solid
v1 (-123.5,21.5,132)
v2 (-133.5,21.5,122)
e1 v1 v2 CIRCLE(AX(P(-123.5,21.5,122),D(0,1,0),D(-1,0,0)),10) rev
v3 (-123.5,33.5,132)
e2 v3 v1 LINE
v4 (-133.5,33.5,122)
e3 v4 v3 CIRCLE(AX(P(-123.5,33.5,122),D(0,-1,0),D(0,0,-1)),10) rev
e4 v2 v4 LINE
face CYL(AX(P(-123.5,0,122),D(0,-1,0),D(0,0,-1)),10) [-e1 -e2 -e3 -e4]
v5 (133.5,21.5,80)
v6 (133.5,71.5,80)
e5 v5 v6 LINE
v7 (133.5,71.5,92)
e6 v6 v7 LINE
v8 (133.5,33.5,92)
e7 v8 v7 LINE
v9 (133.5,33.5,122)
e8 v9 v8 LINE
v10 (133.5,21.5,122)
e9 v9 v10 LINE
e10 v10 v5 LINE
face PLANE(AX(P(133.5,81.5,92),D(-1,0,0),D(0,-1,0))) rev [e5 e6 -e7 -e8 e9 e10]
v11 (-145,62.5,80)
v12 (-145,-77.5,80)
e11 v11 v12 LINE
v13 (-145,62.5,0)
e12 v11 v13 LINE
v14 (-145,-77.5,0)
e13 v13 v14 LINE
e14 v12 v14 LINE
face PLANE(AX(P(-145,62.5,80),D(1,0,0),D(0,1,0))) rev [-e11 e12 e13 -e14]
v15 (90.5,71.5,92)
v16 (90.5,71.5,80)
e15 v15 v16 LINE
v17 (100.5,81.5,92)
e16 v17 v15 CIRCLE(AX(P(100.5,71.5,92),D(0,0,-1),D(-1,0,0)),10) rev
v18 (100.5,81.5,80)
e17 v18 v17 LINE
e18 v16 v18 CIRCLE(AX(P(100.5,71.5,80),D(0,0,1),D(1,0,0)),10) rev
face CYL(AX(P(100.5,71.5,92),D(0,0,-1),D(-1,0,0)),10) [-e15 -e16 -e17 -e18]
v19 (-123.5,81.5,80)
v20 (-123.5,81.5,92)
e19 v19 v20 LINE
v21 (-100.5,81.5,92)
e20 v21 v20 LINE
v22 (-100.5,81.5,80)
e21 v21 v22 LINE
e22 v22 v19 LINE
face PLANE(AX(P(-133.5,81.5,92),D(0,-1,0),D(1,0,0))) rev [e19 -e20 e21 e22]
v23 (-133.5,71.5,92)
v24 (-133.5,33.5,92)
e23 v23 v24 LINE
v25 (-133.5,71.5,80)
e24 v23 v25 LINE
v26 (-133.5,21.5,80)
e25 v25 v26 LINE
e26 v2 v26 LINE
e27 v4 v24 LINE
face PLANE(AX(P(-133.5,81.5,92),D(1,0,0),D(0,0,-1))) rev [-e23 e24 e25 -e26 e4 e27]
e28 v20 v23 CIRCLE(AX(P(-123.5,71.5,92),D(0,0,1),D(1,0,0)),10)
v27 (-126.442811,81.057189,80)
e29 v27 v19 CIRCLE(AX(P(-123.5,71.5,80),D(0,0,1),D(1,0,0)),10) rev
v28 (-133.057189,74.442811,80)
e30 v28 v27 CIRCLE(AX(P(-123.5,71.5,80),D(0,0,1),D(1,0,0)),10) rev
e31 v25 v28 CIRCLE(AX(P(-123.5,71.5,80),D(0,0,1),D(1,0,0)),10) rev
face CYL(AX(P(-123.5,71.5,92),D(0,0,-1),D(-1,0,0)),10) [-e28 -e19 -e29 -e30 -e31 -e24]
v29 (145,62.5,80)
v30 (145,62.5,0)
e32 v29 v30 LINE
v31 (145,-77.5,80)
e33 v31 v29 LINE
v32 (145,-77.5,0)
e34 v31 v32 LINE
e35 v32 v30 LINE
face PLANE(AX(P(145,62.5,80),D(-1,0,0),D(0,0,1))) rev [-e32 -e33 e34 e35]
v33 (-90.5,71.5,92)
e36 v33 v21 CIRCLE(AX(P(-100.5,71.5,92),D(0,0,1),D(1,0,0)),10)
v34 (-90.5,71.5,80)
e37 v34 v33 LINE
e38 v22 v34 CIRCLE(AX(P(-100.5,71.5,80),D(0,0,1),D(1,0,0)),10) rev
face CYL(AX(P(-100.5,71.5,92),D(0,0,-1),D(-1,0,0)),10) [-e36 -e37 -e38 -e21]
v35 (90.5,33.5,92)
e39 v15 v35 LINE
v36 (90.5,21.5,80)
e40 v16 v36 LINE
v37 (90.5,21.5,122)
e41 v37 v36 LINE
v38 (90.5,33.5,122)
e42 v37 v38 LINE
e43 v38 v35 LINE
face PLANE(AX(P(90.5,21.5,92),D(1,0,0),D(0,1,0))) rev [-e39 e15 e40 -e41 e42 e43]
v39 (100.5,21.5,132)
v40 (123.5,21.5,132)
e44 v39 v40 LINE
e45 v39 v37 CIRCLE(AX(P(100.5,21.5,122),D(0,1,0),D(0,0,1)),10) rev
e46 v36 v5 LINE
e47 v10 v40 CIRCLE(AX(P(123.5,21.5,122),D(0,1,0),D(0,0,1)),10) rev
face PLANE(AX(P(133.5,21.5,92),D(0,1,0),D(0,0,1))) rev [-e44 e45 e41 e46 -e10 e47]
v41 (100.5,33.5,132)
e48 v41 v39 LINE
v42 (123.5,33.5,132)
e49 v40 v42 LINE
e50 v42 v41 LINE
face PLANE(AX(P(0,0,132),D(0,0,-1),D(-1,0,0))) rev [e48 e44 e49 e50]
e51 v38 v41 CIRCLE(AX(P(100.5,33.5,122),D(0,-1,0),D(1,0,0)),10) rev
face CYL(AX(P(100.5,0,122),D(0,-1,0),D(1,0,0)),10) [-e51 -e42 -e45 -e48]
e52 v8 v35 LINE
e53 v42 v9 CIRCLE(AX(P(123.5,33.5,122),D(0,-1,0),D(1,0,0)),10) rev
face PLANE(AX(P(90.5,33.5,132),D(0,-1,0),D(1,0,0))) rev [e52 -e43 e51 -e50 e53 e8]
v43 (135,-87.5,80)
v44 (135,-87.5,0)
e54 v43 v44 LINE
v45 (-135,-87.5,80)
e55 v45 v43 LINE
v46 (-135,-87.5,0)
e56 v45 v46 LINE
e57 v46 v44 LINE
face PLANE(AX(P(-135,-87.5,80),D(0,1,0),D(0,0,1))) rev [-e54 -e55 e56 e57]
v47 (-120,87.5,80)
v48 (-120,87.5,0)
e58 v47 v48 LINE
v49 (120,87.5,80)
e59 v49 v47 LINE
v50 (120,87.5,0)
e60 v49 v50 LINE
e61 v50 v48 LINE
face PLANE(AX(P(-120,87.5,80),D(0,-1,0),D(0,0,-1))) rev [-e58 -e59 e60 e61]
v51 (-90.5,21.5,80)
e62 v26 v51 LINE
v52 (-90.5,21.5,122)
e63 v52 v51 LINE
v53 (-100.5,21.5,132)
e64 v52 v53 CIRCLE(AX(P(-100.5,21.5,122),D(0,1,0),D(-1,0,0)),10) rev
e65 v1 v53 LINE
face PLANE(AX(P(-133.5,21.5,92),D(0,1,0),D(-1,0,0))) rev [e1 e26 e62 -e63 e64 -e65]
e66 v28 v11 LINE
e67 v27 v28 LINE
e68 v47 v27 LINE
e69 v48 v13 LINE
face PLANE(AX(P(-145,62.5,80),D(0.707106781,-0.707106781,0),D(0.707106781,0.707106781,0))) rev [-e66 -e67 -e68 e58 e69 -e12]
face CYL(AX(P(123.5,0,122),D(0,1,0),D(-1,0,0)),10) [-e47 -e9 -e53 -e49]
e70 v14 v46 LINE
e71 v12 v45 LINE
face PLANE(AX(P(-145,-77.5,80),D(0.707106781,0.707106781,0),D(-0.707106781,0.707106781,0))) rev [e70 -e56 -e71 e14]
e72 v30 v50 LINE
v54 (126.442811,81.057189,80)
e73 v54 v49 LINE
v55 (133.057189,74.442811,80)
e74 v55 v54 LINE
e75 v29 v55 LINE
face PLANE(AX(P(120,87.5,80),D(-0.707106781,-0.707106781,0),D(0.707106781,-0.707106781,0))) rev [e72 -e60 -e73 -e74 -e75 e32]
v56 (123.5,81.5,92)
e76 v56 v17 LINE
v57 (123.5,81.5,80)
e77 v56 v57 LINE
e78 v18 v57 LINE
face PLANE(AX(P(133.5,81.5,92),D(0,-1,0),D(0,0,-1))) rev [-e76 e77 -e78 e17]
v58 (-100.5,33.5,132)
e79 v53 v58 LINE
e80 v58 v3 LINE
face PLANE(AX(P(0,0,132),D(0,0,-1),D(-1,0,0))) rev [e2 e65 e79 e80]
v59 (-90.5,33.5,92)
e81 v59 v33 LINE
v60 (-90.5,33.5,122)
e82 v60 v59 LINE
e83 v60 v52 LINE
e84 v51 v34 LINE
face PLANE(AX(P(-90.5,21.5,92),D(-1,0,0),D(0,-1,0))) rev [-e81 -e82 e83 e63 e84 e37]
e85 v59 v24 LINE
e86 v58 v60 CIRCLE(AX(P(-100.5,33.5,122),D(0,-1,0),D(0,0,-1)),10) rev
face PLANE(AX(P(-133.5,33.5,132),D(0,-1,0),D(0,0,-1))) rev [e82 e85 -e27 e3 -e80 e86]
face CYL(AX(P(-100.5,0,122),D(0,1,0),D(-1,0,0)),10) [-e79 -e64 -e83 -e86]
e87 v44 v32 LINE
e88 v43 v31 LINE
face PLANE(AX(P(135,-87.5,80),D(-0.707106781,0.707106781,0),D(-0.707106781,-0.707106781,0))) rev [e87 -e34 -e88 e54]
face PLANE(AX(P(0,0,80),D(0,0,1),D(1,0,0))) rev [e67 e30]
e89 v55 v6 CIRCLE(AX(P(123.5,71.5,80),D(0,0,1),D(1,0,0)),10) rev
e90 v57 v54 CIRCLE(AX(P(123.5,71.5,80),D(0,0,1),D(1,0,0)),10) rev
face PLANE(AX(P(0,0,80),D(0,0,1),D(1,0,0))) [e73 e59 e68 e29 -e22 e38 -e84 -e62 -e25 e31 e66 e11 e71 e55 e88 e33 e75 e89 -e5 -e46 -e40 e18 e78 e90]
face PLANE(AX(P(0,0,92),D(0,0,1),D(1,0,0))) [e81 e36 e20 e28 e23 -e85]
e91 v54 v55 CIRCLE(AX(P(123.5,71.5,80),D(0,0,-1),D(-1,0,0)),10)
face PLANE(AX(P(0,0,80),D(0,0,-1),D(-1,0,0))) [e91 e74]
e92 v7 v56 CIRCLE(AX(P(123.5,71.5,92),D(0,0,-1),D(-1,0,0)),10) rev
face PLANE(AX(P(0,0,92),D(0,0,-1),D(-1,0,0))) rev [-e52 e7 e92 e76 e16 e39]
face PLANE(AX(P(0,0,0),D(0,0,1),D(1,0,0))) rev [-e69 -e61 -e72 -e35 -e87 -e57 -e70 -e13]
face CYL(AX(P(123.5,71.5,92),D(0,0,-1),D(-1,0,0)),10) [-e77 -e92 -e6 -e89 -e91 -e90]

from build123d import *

# Parameters (mm, degrees)
EXTRUDE_1_DEPTH = 80
SKETCH_2_W      = 43
SKETCH_2_H      = 60
EXTRUDE_2_DEPTH = 12
SKETCH_3_W      = 43
SKETCH_3_H      = 12
EXTRUDE_3_DEPTH = 40
FILLET_1_R      = 10


with BuildPart() as part:
    # 草图1 → 凸台-拉伸1 (new body)
    with BuildSketch(Plane.XY):
        Polygon((-145, -77.5), (-135, -87.5), (135, -87.5), (145, -77.5), (145, 62.5), (120, 87.5), (-120, 87.5), (-145, 62.5), align=None)
    extrude(amount=EXTRUDE_1_DEPTH)

    # 草图2 → 凸台-拉伸2 (add)
    with BuildSketch(Plane.XY.offset(80)):
        with Locations((-112, 51.5)):
            Rectangle(SKETCH_2_W, SKETCH_2_H)
        with Locations((112, 51.5)):
            Rectangle(SKETCH_2_W, SKETCH_2_H)
    extrude(amount=EXTRUDE_2_DEPTH)

    # 草图3 → 凸台-拉伸3 (add)
    with BuildSketch(Plane.XY.offset(92)):
        with Locations((-112, 27.5)):
            Rectangle(SKETCH_3_W, SKETCH_3_H)
        with Locations((112, 27.5)):
            Rectangle(SKETCH_3_W, SKETCH_3_H)
    extrude(amount=EXTRUDE_3_DEPTH)

    # 圆角1
    # the kernel refuses this fillet: 10 mm, written as the material it takes off along each edge
    with BuildSketch(Plane(origin=(-90.5, 81.5, 80), x_dir=(-1, 0, 0), z_dir=(0, 0, 1)), Plane(origin=(90.5, 81.5, 80), x_dir=(0, -1, 0), z_dir=(0, 0, 1))) as fillet_1_piece_1:
        with BuildLine():
            CenterArc((FILLET_1_R, FILLET_1_R), FILLET_1_R, 180, 90)
            Line((0, FILLET_1_R), (0, 0))
            Line((0, 0), (FILLET_1_R, 0))
        make_face()
    extrude(amount=37, mode=Mode.SUBTRACT)
    with BuildSketch(Plane(origin=(-133.5, 81.5, 80), x_dir=(1, 0, 0), z_dir=(0, 0, 1)), Plane(origin=(133.5, 81.5, 80), x_dir=(0, -1, 0), z_dir=(0, 0, 1))) as fillet_1_piece_2:
        with BuildLine():
            CenterArc((FILLET_1_R, -FILLET_1_R), FILLET_1_R, 90, 90)
            Line((0, -FILLET_1_R), (0, 0))
            Line((0, 0), (FILLET_1_R, 0))
        make_face()
    extrude(amount=37, mode=Mode.SUBTRACT)
    with BuildSketch(Plane(origin=(-133.5, 58.5, 132), x_dir=(1, 0, 0), z_dir=(0, -1, 0)), Plane(origin=(-90.5, -3.5, 132), x_dir=(-1, 0, 0), z_dir=(0, 1, 0)), Plane(origin=(90.5, 58.5, 132), x_dir=(1, 0, 0), z_dir=(0, -1, 0))) as fillet_1_piece_3:
        with BuildLine():
            CenterArc((FILLET_1_R, -FILLET_1_R), FILLET_1_R, 90, 90)
            Line((0, -FILLET_1_R), (0, 0))
            Line((0, 0), (FILLET_1_R, 0))
        make_face()
    extrude(amount=62, mode=Mode.SUBTRACT)
    with BuildSketch(Plane(origin=(133.5, -3.5, 132), x_dir=(0, 0, -1), z_dir=(0, 1, 0))) as fillet_1_piece_4:
        with BuildLine():
            CenterArc((FILLET_1_R, FILLET_1_R), FILLET_1_R, 180, 90)
            Line((0, FILLET_1_R), (0, 0))
            Line((0, 0), (FILLET_1_R, 0))
        make_face()
    extrude(amount=62, mode=Mode.SUBTRACT)


solid = part.part
